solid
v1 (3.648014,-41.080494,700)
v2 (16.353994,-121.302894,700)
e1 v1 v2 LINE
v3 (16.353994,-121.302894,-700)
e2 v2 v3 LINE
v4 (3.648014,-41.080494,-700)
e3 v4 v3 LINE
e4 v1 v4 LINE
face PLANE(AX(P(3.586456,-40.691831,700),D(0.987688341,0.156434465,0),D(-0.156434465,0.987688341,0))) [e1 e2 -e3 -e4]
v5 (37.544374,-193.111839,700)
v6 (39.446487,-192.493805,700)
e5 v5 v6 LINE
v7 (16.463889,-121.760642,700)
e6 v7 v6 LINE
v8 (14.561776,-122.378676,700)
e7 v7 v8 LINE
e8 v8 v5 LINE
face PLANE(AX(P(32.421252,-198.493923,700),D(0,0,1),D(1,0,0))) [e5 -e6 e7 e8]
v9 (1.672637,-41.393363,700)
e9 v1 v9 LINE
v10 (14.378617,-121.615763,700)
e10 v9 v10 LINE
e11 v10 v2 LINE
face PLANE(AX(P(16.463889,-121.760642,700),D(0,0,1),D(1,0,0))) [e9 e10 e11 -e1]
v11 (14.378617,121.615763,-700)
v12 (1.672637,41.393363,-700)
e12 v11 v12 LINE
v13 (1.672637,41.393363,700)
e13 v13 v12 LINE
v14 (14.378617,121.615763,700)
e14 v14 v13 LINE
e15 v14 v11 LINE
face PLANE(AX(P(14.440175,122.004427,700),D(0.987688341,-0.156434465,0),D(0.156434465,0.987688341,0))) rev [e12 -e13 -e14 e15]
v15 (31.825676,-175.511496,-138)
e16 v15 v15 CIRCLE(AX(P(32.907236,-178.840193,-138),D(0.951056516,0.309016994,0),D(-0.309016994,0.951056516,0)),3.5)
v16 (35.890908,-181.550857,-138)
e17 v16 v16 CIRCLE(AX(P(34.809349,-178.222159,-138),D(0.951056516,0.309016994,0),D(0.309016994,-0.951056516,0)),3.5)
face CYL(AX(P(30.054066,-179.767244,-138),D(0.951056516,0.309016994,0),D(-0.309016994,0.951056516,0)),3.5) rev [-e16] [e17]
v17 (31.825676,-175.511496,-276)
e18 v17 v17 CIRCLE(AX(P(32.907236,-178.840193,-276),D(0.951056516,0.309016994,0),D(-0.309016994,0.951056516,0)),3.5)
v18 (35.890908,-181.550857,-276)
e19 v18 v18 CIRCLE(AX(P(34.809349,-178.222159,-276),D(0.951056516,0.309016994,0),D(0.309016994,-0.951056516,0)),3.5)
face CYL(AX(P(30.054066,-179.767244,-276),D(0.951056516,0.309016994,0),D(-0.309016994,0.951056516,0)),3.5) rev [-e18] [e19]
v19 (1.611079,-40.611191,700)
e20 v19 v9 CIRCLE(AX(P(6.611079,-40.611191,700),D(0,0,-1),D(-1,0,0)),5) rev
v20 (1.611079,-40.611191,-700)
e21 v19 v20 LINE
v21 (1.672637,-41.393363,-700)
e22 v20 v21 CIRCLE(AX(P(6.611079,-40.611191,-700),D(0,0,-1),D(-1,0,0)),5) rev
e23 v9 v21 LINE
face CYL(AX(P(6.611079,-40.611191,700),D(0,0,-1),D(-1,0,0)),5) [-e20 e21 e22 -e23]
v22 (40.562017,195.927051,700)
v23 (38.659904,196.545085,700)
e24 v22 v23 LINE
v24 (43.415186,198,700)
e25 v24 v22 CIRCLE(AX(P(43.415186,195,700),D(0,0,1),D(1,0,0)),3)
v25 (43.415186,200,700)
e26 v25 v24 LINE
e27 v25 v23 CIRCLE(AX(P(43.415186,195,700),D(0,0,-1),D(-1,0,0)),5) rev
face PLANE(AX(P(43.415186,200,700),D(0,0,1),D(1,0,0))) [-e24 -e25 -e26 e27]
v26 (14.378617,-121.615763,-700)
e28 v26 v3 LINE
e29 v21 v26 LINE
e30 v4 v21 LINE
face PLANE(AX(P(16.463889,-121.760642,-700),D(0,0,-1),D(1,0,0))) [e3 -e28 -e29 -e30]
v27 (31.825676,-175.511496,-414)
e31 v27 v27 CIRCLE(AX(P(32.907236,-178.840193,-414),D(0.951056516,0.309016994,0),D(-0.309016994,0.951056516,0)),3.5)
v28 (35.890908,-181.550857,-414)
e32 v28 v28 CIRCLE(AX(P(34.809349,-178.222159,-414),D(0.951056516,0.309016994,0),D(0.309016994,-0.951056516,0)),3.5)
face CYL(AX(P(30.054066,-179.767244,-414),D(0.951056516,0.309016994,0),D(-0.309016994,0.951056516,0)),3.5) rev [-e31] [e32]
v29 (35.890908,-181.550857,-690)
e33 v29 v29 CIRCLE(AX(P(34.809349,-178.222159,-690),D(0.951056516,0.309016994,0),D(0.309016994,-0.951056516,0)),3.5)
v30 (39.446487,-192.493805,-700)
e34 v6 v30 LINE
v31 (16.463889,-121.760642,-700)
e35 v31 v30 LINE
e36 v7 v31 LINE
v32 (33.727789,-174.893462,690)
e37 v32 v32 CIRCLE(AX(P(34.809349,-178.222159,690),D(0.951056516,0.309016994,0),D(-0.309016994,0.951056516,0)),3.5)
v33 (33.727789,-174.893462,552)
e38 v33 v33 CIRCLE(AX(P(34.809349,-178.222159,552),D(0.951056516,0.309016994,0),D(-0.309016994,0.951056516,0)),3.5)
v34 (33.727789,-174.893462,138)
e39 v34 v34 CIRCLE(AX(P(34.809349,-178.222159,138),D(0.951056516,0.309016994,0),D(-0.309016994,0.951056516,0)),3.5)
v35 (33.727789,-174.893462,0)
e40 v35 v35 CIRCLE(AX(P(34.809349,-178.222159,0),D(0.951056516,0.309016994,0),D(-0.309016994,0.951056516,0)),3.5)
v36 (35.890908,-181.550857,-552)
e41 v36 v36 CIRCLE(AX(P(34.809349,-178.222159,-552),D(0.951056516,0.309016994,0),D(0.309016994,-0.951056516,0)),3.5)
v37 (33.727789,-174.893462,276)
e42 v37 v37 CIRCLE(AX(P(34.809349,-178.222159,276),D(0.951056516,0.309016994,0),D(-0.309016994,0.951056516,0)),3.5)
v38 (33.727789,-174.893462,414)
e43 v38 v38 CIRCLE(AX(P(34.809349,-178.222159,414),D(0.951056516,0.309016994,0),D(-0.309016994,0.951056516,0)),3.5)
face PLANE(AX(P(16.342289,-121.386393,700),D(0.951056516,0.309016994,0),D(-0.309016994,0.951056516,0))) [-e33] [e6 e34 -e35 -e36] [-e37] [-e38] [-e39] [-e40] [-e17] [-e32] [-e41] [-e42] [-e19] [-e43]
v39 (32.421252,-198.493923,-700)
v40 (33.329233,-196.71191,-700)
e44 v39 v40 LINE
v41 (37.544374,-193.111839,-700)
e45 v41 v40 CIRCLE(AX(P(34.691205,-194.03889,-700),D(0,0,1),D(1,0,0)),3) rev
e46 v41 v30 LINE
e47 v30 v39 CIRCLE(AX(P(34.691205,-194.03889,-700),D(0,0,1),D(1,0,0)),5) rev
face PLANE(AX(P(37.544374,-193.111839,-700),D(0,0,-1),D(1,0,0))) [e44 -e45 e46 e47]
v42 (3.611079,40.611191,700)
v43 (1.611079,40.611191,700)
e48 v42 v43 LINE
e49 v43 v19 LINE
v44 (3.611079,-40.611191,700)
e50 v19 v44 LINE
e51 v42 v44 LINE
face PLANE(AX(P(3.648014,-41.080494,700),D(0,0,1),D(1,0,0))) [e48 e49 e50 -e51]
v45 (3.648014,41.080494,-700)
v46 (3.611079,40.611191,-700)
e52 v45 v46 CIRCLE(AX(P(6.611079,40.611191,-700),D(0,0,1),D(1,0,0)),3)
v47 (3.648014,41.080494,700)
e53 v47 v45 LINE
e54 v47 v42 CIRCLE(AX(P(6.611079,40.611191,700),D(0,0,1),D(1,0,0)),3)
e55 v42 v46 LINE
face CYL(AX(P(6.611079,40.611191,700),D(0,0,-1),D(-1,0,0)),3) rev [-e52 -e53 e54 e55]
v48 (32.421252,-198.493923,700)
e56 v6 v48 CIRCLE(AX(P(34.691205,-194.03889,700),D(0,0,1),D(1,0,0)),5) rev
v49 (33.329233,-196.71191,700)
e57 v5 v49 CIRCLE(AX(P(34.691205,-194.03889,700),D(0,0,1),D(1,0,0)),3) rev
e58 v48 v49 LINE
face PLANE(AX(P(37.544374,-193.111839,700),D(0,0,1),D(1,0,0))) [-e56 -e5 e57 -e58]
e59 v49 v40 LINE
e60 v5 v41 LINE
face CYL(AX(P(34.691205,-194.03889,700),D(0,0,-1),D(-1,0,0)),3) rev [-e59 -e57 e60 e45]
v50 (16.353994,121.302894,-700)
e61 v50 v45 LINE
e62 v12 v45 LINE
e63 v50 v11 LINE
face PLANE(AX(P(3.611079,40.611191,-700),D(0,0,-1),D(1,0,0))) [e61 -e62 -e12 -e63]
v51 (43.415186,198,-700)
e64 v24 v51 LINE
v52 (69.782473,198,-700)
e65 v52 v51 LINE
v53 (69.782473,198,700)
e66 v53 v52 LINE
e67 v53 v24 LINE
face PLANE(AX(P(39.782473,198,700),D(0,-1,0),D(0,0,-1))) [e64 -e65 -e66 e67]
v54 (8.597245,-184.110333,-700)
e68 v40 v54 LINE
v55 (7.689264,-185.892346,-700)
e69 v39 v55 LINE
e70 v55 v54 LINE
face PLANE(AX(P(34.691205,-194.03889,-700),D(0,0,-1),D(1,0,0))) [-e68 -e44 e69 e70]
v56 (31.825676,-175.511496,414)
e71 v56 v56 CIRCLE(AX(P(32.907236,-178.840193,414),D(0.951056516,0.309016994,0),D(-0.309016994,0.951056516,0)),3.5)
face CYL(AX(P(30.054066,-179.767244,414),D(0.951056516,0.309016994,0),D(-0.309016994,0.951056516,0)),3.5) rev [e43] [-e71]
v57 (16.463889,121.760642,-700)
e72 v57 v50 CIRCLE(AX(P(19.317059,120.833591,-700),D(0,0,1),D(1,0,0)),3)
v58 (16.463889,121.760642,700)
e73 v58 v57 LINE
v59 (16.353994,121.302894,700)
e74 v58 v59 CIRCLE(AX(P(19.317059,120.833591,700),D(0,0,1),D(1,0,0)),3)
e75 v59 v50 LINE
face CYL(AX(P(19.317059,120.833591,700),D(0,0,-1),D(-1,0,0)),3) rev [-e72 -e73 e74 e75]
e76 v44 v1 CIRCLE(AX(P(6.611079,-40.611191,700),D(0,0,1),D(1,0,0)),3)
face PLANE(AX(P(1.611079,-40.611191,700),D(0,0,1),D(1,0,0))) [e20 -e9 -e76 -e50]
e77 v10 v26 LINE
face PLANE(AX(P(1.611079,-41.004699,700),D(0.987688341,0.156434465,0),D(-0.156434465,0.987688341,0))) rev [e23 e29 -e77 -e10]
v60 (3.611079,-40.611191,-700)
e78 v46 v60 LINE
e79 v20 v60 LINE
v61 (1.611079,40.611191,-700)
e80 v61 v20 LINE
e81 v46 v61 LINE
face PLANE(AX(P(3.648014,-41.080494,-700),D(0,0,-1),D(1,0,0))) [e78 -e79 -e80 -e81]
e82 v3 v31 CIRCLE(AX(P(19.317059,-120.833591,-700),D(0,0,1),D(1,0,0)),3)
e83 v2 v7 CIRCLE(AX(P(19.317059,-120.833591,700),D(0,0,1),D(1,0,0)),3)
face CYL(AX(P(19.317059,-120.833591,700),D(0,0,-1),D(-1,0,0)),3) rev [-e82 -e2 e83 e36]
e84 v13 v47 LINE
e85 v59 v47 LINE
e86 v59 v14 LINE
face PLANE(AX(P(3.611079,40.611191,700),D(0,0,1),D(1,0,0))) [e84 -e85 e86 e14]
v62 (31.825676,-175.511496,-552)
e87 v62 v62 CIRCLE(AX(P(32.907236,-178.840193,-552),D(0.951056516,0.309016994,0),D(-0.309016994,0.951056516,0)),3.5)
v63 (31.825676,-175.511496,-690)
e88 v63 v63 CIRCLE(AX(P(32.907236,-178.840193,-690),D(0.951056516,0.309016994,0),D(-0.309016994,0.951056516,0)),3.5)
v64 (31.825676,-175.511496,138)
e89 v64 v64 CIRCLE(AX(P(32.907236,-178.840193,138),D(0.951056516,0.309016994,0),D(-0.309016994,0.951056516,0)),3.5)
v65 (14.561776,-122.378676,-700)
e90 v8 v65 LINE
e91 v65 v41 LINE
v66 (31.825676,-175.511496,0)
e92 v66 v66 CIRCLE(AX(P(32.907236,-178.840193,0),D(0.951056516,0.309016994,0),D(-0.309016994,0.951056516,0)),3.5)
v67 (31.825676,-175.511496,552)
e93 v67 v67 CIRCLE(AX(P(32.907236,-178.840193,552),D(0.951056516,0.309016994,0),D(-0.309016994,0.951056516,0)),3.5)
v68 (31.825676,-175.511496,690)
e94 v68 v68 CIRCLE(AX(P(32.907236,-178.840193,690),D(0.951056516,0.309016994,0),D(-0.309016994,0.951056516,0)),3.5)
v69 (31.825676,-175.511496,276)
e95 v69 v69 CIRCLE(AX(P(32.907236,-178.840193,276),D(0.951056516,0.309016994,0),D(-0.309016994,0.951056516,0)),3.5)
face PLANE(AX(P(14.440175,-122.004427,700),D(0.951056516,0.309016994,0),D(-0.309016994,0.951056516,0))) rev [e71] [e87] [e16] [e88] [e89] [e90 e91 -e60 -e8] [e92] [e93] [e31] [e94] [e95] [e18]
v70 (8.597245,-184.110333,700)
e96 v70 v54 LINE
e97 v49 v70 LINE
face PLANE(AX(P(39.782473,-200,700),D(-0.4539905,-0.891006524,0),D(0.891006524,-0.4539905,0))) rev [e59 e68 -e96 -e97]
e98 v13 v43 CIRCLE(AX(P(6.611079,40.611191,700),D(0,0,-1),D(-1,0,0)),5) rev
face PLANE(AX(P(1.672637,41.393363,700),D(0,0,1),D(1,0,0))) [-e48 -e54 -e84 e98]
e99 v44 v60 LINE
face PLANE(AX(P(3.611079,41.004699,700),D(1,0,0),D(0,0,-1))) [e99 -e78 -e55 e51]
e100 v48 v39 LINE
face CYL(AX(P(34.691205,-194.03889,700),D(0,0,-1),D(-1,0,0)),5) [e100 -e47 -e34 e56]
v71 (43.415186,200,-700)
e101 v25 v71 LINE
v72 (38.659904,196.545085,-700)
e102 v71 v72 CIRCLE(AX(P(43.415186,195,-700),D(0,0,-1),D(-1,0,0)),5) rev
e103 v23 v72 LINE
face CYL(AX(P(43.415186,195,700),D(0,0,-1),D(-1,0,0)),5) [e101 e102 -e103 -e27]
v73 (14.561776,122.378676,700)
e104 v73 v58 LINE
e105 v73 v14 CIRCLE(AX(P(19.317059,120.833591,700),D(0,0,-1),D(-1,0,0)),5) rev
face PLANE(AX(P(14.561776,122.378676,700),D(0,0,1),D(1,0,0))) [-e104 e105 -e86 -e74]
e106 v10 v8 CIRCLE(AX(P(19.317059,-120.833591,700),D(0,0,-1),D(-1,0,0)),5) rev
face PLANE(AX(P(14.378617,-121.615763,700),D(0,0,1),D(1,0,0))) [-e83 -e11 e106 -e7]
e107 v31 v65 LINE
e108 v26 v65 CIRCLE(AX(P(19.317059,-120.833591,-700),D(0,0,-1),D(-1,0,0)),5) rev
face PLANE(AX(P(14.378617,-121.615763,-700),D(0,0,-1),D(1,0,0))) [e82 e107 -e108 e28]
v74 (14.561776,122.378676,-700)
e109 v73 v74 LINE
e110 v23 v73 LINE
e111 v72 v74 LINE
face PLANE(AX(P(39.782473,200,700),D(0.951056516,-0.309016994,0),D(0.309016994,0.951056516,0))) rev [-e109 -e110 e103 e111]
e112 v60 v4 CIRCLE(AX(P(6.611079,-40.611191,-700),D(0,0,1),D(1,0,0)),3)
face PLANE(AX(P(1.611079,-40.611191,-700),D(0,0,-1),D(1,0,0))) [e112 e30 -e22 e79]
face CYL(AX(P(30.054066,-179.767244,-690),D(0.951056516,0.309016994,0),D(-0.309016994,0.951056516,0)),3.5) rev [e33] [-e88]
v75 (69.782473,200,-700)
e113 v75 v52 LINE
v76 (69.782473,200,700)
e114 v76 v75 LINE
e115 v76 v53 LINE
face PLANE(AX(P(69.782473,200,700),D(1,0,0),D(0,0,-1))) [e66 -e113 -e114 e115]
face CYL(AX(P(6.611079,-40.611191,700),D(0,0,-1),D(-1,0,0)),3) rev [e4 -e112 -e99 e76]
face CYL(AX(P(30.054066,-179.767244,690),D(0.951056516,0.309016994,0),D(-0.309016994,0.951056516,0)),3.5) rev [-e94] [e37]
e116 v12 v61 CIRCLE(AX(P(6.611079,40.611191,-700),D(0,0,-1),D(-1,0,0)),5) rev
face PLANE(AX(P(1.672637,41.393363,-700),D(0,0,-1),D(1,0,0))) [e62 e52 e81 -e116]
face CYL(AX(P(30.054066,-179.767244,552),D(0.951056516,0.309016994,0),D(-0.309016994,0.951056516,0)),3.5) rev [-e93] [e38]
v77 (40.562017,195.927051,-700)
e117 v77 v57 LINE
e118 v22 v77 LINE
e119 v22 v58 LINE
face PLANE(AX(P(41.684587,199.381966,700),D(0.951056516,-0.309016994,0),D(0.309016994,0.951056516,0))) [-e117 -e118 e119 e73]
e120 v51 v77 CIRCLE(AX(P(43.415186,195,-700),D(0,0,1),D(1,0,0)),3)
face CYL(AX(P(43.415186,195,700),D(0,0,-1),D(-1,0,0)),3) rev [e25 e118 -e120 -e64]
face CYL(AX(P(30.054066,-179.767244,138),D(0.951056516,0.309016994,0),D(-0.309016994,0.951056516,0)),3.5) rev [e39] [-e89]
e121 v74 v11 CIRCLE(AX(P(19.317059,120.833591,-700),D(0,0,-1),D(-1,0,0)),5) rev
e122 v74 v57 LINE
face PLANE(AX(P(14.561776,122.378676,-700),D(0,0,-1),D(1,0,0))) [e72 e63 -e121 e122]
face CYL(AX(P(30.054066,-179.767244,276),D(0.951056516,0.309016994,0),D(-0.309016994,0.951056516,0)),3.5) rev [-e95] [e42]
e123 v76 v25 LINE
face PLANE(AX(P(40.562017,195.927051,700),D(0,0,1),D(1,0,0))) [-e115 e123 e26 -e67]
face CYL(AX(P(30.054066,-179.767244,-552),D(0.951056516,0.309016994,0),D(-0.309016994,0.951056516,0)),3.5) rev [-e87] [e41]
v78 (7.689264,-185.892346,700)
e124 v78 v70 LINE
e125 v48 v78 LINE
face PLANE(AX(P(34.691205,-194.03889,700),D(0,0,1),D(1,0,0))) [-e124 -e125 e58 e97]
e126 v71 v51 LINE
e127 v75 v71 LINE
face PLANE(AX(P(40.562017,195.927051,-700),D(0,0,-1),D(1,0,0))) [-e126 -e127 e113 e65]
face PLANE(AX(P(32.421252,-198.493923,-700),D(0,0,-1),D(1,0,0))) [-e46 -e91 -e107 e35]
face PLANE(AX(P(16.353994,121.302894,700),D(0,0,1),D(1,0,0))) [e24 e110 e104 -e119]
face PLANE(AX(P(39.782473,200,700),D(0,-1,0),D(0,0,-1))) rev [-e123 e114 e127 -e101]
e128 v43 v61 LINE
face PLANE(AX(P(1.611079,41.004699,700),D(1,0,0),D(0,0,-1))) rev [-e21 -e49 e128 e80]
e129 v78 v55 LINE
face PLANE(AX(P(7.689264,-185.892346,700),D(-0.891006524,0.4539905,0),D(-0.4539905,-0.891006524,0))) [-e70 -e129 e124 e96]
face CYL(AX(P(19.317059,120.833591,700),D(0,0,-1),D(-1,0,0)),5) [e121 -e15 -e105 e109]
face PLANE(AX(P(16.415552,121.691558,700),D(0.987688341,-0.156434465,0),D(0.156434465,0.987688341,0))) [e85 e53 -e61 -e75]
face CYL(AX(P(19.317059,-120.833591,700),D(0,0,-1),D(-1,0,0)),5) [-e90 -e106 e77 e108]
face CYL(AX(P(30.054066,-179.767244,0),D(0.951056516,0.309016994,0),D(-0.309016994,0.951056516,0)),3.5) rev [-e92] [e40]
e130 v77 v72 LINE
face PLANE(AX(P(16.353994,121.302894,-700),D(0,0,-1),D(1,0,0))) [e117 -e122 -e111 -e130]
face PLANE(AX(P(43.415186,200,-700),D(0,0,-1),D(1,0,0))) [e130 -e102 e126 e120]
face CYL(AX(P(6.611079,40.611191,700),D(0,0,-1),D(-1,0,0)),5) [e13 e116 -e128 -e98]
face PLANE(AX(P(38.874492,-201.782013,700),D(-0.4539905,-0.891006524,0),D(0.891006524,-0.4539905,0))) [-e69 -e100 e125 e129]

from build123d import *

# Parameters (mm, degrees)
SM_BASE_FLANGE_1_DEPTH = 700
SKETCH_2_R             = 3.5
CUT_EXTRUDE_1_DEPTH    = 5


# Sheet-metal steps are written as plain solids
with BuildPart() as part:
    # Sketch 1 → Базовая кромка1 (new body)
    with BuildSketch(Plane.XY):
        with BuildLine():
            Line((69.782473476, 200), (43.415186116, 200))
            ThreePointArc((43.415186116, 200), (40.476259854, 199.045084972), (38.659903534, 196.545084972))
            Line((38.659903534, 196.545084972), (14.561776314, 122.37867555))
            ThreePointArc((14.561776314, 122.37867555), (14.455209294, 122.000817397), (14.378617193, 121.615762903))
            Line((14.378617193, 121.615762903), (1.672637328, 41.393363285))
            ThreePointArc((1.672637328, 41.393363285), (1.626492362, 41.003486439), (1.611079031, 40.61119096))
            Line((1.611079031, 40.61119096), (1.611079031, -40.61119096))
            ThreePointArc((1.611079031, -40.61119096), (1.626492362, -41.003486439), (1.672637328, -41.393363285))
            Line((1.672637328, -41.393363285), (14.378617193, -121.615762903))
            ThreePointArc((14.378617193, -121.615762903), (14.455209294, -122.000817397), (14.561776314, -122.37867555))
            Line((14.561776314, -122.37867555), (37.544374419, -193.111839379))
            ThreePointArc((37.544374419, -193.111839379), (36.639549016, -196.320108259), (33.329233371, -196.711909935))
            Line((33.329233371, -196.711909935), (8.597245129, -184.110332509))
            Line((8.597245129, -184.110332509), (7.68926413, -185.892345557))
            Line((7.68926413, -185.892345557), (32.421252372, -198.493922983))
            ThreePointArc((32.421252372, -198.493922983), (37.938445112, -197.84092019), (39.446487452, -192.493805391))
            Line((39.446487452, -192.493805391), (16.463889347, -121.760641561))
            ThreePointArc((16.463889347, -121.760641561), (16.399949135, -121.53392667), (16.353993874, -121.302893973))
            Line((16.353993874, -121.302893973), (3.648014009, -41.080494355))
            ThreePointArc((3.648014009, -41.080494355), (3.62032703, -40.846568247), (3.611079031, -40.61119096))
            Line((3.611079031, -40.61119096), (3.611079031, 40.61119096))
            ThreePointArc((3.611079031, 40.61119096), (3.62032703, 40.846568247), (3.648014009, 41.080494355))
            Line((3.648014009, 41.080494355), (16.353993874, 121.302893973))
            ThreePointArc((16.353993874, 121.302893973), (16.399949135, 121.53392667), (16.463889347, 121.760641561))
            Line((16.463889347, 121.760641561), (40.562016567, 195.927050983))
            ThreePointArc((40.562016567, 195.927050983), (41.651830359, 197.427050983), (43.415186116, 198))
            Line((43.415186116, 198), (69.782473476, 198))
            Line((69.782473476, 198), (69.782473476, 200))
        make_face()
    extrude(amount=SM_BASE_FLANGE_1_DEPTH)

    # Зеркальное отражение1: part across plane


with BuildPart() as part_1:
    add(part.part)
    add(part.part.mirror(Plane(origin=(34.691204871, -194.038890362, 0), x_dir=(1, 0, 0), z_dir=(0, 0, 1))))

    # Sketch 2 → Вырез-Вытянуть1 (cut)
    with BuildSketch(Plane(origin=(-20.892826899, -6.788490969, 0), x_dir=(0, 0, -1), z_dir=(0.9510565162951543, 0.3090169943749452, 0))):
        with Locations(Location((-690, -180.2560263, 0), (0, 0, 90))):
            Circle(SKETCH_2_R)
        with Locations(Location((-552, -180.2560263, 0), (0, 0, 90))):
            Circle(SKETCH_2_R)
        with Locations(Location((-414, -180.2560263, 0), (0, 0, 90))):
            Circle(SKETCH_2_R)
        with Locations(Location((-276, -180.2560263, 0), (0, 0, 90))):
            Circle(SKETCH_2_R)
        with Locations(Location((-138, -180.2560263, 0), (0, 0, 90))):
            Circle(SKETCH_2_R)
        with Locations(Location((0, -180.2560263, 0), (0, 0, 90))):
            Circle(SKETCH_2_R)
        with Locations(Location((690, -180.2560263, 0), (0, 0, 90))):
            Circle(SKETCH_2_R)
        with Locations(Location((552, -180.2560263, 0), (0, 0, 90))):
            Circle(SKETCH_2_R)
        with Locations(Location((414, -180.2560263, 0), (0, 0, 90))):
            Circle(SKETCH_2_R)
        with Locations(Location((276, -180.2560263, 0), (0, 0, 90))):
            Circle(SKETCH_2_R)
        with Locations(Location((138, -180.2560263, 0), (0, 0, 90))):
            Circle(SKETCH_2_R)
    extrude(amount=-CUT_EXTRUDE_1_DEPTH, mode=Mode.SUBTRACT)


solid = part_1.part
